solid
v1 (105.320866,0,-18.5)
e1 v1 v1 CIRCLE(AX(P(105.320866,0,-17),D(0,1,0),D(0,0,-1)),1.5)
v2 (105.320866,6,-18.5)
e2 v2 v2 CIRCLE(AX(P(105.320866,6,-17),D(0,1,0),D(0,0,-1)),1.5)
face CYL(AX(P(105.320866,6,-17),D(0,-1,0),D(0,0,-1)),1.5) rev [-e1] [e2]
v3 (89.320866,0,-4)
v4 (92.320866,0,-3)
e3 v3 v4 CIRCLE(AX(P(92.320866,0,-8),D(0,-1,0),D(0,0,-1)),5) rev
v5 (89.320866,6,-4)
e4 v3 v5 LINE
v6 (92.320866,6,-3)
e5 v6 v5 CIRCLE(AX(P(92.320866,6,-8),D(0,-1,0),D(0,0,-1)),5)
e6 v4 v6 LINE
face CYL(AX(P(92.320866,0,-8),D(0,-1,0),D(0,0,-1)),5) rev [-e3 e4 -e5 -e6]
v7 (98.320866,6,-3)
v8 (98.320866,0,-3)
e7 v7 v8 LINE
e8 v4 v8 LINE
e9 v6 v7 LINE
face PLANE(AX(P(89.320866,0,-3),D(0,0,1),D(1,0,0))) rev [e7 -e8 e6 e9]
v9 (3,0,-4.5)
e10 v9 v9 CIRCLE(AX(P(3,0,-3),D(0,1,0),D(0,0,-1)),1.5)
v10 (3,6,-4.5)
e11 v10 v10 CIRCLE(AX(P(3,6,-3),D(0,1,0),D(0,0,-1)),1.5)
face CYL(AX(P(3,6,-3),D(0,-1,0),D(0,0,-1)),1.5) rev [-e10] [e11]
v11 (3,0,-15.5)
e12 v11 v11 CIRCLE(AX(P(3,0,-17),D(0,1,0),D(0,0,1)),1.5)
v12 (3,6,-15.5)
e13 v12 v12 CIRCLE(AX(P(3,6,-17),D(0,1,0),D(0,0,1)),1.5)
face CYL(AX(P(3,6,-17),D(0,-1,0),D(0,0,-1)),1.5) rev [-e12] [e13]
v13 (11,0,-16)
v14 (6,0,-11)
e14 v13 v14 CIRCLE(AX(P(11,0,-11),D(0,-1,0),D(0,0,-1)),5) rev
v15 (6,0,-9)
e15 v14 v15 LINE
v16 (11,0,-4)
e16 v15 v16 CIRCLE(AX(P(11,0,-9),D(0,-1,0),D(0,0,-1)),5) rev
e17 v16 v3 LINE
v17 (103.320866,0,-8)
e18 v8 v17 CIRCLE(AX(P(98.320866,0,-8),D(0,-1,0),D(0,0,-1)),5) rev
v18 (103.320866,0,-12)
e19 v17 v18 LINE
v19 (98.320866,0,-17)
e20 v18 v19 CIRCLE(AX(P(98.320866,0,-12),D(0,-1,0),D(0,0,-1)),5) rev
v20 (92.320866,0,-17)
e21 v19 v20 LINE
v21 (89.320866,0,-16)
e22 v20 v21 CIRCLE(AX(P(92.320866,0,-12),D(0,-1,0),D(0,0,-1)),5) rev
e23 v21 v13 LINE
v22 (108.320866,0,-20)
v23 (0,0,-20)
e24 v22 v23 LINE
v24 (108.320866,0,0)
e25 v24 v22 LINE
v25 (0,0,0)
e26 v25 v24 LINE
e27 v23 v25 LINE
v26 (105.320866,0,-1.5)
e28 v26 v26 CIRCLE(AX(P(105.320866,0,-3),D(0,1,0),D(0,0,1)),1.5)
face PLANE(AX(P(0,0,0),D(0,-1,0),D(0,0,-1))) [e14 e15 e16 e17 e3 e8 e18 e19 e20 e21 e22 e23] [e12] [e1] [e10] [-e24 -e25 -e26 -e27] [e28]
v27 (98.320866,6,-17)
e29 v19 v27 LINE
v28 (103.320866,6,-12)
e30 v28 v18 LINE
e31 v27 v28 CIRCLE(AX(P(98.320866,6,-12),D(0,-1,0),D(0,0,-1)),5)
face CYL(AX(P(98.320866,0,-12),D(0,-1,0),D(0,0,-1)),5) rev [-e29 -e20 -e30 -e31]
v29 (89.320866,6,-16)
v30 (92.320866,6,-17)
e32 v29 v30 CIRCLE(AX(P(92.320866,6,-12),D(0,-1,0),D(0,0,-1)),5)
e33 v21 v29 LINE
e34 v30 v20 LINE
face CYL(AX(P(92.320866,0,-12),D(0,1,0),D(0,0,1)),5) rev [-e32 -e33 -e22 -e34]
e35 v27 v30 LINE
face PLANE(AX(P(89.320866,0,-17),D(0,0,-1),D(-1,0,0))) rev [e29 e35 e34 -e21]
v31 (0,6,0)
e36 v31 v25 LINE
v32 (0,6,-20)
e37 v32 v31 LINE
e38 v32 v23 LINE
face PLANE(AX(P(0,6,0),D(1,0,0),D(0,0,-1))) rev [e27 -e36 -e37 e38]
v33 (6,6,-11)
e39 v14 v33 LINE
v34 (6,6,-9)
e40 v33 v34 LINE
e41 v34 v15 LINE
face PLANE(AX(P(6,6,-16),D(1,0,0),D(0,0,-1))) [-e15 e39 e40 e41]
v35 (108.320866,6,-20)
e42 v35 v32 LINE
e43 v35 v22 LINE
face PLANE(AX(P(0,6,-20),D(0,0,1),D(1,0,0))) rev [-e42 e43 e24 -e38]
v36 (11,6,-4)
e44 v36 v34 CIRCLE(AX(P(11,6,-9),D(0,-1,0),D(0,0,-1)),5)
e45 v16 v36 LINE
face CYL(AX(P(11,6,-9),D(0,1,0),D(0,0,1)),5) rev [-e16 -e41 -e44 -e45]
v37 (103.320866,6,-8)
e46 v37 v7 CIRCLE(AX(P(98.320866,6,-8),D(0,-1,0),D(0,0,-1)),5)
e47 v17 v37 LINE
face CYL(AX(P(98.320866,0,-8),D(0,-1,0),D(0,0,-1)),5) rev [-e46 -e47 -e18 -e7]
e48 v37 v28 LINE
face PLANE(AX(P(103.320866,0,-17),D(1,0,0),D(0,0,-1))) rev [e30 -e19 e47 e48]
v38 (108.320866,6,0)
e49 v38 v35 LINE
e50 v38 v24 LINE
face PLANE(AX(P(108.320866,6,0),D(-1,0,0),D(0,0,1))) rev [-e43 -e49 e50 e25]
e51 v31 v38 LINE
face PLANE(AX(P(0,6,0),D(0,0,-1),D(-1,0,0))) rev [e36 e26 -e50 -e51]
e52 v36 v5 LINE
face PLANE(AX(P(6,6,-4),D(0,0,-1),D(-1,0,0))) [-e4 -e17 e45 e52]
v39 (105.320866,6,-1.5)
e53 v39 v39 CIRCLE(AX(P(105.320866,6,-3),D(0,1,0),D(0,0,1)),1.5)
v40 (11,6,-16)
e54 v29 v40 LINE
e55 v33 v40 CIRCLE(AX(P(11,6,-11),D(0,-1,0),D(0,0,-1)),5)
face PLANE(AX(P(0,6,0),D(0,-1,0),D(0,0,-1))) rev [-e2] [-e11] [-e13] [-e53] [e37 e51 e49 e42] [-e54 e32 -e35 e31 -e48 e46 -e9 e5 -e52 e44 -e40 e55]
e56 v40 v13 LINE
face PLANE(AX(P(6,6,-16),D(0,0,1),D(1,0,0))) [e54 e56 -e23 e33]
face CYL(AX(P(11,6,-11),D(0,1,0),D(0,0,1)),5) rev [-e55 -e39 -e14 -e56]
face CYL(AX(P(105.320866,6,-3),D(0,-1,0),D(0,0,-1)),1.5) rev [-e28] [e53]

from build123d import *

# Parameters (mm, degrees)
SKETCH1_W           = 108.320866354
SKETCH1_H           = 20
SKETCH1_R           = 1.5
SKETCH1_W_2         = 96.320866354
SKETCH1_H_2         = 12
BOSS_EXTRUDE1_DEPTH = 6
CUT_EXTRUDE1_DEPTH  = 111.315049234
FILLET1_R           = 5


with BuildPart() as part:
    # Sketch1 → Boss-Extrude1 (new body)
    with BuildSketch(Plane(origin=(0, 0, 0), x_dir=(1, 0, 0), z_dir=(0, 1, 0))):
        with Locations((54.160433177, 10)):
            Rectangle(SKETCH1_W, SKETCH1_H)
        with Locations(Location((3, 17, 0), (0, 0, 270))):
            Circle(SKETCH1_R, mode=Mode.SUBTRACT)
        with Locations(Location((3, 3, 0), (0, 0, 90))):
            Circle(SKETCH1_R, mode=Mode.SUBTRACT)
        with Locations(Location((105.320866354, 3, 0), (0, 0, 270))):
            Circle(SKETCH1_R, mode=Mode.SUBTRACT)
        with Locations(Location((105.320866354, 17, 0), (0, 0, 90))):
            Circle(SKETCH1_R, mode=Mode.SUBTRACT)
        with Locations((54.160433177, 10)):
            Rectangle(SKETCH1_W_2, SKETCH1_H_2, mode=Mode.SUBTRACT)
    extrude(amount=BOSS_EXTRUDE1_DEPTH)

    # Sketch2 → Cut-Extrude1 (cut, through all)
    with BuildSketch(Plane(origin=(0, 6, 0), x_dir=(1, 0, 0), z_dir=(0, 1, 0))):
        Polygon((89.320866354, 17), (89.320866354, 16), (102.320866354, 16), (102.320866354, 4), (89.320866354, 4), (89.320866354, 3), (103.320866354, 3), (103.320866354, 17), align=None)
    extrude(amount=-CUT_EXTRUDE1_DEPTH, mode=Mode.SUBTRACT)

    # Fillet1
    # the kernel refuses this fillet: 5 mm, written as the material it adds along each edge
    with BuildSketch(Plane(origin=(103.320866354, 6, -17), x_dir=(0, 0, 1), z_dir=(0, -1, 0)), Plane(origin=(103.320866354, 6, -3), x_dir=(-1, 0, 0), z_dir=(0, -1, 0)), Plane(origin=(6, 0, -16), x_dir=(0, 0, 1), z_dir=(0, 1, 0))) as fillet1_piece_1:
        with BuildLine():
            CenterArc((FILLET1_R, FILLET1_R), FILLET1_R, 180, 90)
            Line((0, FILLET1_R), (-FILLET1_R * 0.02, FILLET1_R))
            Line((-FILLET1_R * 0.02, FILLET1_R), (-FILLET1_R * 0.02, -FILLET1_R * 0.02))
            Line((-FILLET1_R * 0.02, -FILLET1_R * 0.02), (FILLET1_R, -FILLET1_R * 0.02))
            Line((FILLET1_R, -FILLET1_R * 0.02), (FILLET1_R, 0))
        make_face()
    extrude(amount=6)
    with BuildSketch(Plane(origin=(89.320866354, 6, -17), x_dir=(1, 0, 0), z_dir=(0, -1, 0))) as fillet1_piece_2:
        with BuildLine():
            CenterArc((3, 5), FILLET1_R, 233.130102354, 36.869897646)
            Line((0, 1), (-0.06, 0.92))
            ThreePointArc((-0.06, 0.92), (-0.1, 0.5), (-0.1, 0))
            Line((-0.1, 0), (0, -0.1))
            Line((0, -0.1), (3, -0.1))
            Line((3, -0.1), (3, 0))
        make_face()
    extrude(amount=6)
    with BuildSketch(Plane(origin=(89.320866354, 6, -3), x_dir=(0, 0, -1), z_dir=(0, -1, 0))) as fillet1_piece_3:
        with BuildLine():
            CenterArc((5, 3), FILLET1_R, 180, 36.869897646)
            Line((0, 3), (-0.1, 3))
            Line((-0.1, 3), (-0.1, 0))
            Line((-0.1, 0), (0, -0.1))
            ThreePointArc((0, -0.1), (0.5, -0.1), (0.92, -0.06))
            Line((0.92, -0.06), (1, 0))
        make_face()
    extrude(amount=6)
    with BuildSketch(Plane(origin=(6, 0, -4), x_dir=(0, 0, -1), z_dir=(0, 1, 0))) as fillet1_piece_4:
        with BuildLine():
            CenterArc((FILLET1_R, -FILLET1_R), FILLET1_R, 90, 90)
            Line((0, -FILLET1_R), (-FILLET1_R * 0.02, -FILLET1_R))
            Line((-FILLET1_R * 0.02, -FILLET1_R), (-FILLET1_R * 0.02, FILLET1_R * 0.02))
            Line((-FILLET1_R * 0.02, FILLET1_R * 0.02), (FILLET1_R, FILLET1_R * 0.02))
            Line((FILLET1_R, FILLET1_R * 0.02), (FILLET1_R, 0))
        make_face()
    extrude(amount=6)


solid = part.part
